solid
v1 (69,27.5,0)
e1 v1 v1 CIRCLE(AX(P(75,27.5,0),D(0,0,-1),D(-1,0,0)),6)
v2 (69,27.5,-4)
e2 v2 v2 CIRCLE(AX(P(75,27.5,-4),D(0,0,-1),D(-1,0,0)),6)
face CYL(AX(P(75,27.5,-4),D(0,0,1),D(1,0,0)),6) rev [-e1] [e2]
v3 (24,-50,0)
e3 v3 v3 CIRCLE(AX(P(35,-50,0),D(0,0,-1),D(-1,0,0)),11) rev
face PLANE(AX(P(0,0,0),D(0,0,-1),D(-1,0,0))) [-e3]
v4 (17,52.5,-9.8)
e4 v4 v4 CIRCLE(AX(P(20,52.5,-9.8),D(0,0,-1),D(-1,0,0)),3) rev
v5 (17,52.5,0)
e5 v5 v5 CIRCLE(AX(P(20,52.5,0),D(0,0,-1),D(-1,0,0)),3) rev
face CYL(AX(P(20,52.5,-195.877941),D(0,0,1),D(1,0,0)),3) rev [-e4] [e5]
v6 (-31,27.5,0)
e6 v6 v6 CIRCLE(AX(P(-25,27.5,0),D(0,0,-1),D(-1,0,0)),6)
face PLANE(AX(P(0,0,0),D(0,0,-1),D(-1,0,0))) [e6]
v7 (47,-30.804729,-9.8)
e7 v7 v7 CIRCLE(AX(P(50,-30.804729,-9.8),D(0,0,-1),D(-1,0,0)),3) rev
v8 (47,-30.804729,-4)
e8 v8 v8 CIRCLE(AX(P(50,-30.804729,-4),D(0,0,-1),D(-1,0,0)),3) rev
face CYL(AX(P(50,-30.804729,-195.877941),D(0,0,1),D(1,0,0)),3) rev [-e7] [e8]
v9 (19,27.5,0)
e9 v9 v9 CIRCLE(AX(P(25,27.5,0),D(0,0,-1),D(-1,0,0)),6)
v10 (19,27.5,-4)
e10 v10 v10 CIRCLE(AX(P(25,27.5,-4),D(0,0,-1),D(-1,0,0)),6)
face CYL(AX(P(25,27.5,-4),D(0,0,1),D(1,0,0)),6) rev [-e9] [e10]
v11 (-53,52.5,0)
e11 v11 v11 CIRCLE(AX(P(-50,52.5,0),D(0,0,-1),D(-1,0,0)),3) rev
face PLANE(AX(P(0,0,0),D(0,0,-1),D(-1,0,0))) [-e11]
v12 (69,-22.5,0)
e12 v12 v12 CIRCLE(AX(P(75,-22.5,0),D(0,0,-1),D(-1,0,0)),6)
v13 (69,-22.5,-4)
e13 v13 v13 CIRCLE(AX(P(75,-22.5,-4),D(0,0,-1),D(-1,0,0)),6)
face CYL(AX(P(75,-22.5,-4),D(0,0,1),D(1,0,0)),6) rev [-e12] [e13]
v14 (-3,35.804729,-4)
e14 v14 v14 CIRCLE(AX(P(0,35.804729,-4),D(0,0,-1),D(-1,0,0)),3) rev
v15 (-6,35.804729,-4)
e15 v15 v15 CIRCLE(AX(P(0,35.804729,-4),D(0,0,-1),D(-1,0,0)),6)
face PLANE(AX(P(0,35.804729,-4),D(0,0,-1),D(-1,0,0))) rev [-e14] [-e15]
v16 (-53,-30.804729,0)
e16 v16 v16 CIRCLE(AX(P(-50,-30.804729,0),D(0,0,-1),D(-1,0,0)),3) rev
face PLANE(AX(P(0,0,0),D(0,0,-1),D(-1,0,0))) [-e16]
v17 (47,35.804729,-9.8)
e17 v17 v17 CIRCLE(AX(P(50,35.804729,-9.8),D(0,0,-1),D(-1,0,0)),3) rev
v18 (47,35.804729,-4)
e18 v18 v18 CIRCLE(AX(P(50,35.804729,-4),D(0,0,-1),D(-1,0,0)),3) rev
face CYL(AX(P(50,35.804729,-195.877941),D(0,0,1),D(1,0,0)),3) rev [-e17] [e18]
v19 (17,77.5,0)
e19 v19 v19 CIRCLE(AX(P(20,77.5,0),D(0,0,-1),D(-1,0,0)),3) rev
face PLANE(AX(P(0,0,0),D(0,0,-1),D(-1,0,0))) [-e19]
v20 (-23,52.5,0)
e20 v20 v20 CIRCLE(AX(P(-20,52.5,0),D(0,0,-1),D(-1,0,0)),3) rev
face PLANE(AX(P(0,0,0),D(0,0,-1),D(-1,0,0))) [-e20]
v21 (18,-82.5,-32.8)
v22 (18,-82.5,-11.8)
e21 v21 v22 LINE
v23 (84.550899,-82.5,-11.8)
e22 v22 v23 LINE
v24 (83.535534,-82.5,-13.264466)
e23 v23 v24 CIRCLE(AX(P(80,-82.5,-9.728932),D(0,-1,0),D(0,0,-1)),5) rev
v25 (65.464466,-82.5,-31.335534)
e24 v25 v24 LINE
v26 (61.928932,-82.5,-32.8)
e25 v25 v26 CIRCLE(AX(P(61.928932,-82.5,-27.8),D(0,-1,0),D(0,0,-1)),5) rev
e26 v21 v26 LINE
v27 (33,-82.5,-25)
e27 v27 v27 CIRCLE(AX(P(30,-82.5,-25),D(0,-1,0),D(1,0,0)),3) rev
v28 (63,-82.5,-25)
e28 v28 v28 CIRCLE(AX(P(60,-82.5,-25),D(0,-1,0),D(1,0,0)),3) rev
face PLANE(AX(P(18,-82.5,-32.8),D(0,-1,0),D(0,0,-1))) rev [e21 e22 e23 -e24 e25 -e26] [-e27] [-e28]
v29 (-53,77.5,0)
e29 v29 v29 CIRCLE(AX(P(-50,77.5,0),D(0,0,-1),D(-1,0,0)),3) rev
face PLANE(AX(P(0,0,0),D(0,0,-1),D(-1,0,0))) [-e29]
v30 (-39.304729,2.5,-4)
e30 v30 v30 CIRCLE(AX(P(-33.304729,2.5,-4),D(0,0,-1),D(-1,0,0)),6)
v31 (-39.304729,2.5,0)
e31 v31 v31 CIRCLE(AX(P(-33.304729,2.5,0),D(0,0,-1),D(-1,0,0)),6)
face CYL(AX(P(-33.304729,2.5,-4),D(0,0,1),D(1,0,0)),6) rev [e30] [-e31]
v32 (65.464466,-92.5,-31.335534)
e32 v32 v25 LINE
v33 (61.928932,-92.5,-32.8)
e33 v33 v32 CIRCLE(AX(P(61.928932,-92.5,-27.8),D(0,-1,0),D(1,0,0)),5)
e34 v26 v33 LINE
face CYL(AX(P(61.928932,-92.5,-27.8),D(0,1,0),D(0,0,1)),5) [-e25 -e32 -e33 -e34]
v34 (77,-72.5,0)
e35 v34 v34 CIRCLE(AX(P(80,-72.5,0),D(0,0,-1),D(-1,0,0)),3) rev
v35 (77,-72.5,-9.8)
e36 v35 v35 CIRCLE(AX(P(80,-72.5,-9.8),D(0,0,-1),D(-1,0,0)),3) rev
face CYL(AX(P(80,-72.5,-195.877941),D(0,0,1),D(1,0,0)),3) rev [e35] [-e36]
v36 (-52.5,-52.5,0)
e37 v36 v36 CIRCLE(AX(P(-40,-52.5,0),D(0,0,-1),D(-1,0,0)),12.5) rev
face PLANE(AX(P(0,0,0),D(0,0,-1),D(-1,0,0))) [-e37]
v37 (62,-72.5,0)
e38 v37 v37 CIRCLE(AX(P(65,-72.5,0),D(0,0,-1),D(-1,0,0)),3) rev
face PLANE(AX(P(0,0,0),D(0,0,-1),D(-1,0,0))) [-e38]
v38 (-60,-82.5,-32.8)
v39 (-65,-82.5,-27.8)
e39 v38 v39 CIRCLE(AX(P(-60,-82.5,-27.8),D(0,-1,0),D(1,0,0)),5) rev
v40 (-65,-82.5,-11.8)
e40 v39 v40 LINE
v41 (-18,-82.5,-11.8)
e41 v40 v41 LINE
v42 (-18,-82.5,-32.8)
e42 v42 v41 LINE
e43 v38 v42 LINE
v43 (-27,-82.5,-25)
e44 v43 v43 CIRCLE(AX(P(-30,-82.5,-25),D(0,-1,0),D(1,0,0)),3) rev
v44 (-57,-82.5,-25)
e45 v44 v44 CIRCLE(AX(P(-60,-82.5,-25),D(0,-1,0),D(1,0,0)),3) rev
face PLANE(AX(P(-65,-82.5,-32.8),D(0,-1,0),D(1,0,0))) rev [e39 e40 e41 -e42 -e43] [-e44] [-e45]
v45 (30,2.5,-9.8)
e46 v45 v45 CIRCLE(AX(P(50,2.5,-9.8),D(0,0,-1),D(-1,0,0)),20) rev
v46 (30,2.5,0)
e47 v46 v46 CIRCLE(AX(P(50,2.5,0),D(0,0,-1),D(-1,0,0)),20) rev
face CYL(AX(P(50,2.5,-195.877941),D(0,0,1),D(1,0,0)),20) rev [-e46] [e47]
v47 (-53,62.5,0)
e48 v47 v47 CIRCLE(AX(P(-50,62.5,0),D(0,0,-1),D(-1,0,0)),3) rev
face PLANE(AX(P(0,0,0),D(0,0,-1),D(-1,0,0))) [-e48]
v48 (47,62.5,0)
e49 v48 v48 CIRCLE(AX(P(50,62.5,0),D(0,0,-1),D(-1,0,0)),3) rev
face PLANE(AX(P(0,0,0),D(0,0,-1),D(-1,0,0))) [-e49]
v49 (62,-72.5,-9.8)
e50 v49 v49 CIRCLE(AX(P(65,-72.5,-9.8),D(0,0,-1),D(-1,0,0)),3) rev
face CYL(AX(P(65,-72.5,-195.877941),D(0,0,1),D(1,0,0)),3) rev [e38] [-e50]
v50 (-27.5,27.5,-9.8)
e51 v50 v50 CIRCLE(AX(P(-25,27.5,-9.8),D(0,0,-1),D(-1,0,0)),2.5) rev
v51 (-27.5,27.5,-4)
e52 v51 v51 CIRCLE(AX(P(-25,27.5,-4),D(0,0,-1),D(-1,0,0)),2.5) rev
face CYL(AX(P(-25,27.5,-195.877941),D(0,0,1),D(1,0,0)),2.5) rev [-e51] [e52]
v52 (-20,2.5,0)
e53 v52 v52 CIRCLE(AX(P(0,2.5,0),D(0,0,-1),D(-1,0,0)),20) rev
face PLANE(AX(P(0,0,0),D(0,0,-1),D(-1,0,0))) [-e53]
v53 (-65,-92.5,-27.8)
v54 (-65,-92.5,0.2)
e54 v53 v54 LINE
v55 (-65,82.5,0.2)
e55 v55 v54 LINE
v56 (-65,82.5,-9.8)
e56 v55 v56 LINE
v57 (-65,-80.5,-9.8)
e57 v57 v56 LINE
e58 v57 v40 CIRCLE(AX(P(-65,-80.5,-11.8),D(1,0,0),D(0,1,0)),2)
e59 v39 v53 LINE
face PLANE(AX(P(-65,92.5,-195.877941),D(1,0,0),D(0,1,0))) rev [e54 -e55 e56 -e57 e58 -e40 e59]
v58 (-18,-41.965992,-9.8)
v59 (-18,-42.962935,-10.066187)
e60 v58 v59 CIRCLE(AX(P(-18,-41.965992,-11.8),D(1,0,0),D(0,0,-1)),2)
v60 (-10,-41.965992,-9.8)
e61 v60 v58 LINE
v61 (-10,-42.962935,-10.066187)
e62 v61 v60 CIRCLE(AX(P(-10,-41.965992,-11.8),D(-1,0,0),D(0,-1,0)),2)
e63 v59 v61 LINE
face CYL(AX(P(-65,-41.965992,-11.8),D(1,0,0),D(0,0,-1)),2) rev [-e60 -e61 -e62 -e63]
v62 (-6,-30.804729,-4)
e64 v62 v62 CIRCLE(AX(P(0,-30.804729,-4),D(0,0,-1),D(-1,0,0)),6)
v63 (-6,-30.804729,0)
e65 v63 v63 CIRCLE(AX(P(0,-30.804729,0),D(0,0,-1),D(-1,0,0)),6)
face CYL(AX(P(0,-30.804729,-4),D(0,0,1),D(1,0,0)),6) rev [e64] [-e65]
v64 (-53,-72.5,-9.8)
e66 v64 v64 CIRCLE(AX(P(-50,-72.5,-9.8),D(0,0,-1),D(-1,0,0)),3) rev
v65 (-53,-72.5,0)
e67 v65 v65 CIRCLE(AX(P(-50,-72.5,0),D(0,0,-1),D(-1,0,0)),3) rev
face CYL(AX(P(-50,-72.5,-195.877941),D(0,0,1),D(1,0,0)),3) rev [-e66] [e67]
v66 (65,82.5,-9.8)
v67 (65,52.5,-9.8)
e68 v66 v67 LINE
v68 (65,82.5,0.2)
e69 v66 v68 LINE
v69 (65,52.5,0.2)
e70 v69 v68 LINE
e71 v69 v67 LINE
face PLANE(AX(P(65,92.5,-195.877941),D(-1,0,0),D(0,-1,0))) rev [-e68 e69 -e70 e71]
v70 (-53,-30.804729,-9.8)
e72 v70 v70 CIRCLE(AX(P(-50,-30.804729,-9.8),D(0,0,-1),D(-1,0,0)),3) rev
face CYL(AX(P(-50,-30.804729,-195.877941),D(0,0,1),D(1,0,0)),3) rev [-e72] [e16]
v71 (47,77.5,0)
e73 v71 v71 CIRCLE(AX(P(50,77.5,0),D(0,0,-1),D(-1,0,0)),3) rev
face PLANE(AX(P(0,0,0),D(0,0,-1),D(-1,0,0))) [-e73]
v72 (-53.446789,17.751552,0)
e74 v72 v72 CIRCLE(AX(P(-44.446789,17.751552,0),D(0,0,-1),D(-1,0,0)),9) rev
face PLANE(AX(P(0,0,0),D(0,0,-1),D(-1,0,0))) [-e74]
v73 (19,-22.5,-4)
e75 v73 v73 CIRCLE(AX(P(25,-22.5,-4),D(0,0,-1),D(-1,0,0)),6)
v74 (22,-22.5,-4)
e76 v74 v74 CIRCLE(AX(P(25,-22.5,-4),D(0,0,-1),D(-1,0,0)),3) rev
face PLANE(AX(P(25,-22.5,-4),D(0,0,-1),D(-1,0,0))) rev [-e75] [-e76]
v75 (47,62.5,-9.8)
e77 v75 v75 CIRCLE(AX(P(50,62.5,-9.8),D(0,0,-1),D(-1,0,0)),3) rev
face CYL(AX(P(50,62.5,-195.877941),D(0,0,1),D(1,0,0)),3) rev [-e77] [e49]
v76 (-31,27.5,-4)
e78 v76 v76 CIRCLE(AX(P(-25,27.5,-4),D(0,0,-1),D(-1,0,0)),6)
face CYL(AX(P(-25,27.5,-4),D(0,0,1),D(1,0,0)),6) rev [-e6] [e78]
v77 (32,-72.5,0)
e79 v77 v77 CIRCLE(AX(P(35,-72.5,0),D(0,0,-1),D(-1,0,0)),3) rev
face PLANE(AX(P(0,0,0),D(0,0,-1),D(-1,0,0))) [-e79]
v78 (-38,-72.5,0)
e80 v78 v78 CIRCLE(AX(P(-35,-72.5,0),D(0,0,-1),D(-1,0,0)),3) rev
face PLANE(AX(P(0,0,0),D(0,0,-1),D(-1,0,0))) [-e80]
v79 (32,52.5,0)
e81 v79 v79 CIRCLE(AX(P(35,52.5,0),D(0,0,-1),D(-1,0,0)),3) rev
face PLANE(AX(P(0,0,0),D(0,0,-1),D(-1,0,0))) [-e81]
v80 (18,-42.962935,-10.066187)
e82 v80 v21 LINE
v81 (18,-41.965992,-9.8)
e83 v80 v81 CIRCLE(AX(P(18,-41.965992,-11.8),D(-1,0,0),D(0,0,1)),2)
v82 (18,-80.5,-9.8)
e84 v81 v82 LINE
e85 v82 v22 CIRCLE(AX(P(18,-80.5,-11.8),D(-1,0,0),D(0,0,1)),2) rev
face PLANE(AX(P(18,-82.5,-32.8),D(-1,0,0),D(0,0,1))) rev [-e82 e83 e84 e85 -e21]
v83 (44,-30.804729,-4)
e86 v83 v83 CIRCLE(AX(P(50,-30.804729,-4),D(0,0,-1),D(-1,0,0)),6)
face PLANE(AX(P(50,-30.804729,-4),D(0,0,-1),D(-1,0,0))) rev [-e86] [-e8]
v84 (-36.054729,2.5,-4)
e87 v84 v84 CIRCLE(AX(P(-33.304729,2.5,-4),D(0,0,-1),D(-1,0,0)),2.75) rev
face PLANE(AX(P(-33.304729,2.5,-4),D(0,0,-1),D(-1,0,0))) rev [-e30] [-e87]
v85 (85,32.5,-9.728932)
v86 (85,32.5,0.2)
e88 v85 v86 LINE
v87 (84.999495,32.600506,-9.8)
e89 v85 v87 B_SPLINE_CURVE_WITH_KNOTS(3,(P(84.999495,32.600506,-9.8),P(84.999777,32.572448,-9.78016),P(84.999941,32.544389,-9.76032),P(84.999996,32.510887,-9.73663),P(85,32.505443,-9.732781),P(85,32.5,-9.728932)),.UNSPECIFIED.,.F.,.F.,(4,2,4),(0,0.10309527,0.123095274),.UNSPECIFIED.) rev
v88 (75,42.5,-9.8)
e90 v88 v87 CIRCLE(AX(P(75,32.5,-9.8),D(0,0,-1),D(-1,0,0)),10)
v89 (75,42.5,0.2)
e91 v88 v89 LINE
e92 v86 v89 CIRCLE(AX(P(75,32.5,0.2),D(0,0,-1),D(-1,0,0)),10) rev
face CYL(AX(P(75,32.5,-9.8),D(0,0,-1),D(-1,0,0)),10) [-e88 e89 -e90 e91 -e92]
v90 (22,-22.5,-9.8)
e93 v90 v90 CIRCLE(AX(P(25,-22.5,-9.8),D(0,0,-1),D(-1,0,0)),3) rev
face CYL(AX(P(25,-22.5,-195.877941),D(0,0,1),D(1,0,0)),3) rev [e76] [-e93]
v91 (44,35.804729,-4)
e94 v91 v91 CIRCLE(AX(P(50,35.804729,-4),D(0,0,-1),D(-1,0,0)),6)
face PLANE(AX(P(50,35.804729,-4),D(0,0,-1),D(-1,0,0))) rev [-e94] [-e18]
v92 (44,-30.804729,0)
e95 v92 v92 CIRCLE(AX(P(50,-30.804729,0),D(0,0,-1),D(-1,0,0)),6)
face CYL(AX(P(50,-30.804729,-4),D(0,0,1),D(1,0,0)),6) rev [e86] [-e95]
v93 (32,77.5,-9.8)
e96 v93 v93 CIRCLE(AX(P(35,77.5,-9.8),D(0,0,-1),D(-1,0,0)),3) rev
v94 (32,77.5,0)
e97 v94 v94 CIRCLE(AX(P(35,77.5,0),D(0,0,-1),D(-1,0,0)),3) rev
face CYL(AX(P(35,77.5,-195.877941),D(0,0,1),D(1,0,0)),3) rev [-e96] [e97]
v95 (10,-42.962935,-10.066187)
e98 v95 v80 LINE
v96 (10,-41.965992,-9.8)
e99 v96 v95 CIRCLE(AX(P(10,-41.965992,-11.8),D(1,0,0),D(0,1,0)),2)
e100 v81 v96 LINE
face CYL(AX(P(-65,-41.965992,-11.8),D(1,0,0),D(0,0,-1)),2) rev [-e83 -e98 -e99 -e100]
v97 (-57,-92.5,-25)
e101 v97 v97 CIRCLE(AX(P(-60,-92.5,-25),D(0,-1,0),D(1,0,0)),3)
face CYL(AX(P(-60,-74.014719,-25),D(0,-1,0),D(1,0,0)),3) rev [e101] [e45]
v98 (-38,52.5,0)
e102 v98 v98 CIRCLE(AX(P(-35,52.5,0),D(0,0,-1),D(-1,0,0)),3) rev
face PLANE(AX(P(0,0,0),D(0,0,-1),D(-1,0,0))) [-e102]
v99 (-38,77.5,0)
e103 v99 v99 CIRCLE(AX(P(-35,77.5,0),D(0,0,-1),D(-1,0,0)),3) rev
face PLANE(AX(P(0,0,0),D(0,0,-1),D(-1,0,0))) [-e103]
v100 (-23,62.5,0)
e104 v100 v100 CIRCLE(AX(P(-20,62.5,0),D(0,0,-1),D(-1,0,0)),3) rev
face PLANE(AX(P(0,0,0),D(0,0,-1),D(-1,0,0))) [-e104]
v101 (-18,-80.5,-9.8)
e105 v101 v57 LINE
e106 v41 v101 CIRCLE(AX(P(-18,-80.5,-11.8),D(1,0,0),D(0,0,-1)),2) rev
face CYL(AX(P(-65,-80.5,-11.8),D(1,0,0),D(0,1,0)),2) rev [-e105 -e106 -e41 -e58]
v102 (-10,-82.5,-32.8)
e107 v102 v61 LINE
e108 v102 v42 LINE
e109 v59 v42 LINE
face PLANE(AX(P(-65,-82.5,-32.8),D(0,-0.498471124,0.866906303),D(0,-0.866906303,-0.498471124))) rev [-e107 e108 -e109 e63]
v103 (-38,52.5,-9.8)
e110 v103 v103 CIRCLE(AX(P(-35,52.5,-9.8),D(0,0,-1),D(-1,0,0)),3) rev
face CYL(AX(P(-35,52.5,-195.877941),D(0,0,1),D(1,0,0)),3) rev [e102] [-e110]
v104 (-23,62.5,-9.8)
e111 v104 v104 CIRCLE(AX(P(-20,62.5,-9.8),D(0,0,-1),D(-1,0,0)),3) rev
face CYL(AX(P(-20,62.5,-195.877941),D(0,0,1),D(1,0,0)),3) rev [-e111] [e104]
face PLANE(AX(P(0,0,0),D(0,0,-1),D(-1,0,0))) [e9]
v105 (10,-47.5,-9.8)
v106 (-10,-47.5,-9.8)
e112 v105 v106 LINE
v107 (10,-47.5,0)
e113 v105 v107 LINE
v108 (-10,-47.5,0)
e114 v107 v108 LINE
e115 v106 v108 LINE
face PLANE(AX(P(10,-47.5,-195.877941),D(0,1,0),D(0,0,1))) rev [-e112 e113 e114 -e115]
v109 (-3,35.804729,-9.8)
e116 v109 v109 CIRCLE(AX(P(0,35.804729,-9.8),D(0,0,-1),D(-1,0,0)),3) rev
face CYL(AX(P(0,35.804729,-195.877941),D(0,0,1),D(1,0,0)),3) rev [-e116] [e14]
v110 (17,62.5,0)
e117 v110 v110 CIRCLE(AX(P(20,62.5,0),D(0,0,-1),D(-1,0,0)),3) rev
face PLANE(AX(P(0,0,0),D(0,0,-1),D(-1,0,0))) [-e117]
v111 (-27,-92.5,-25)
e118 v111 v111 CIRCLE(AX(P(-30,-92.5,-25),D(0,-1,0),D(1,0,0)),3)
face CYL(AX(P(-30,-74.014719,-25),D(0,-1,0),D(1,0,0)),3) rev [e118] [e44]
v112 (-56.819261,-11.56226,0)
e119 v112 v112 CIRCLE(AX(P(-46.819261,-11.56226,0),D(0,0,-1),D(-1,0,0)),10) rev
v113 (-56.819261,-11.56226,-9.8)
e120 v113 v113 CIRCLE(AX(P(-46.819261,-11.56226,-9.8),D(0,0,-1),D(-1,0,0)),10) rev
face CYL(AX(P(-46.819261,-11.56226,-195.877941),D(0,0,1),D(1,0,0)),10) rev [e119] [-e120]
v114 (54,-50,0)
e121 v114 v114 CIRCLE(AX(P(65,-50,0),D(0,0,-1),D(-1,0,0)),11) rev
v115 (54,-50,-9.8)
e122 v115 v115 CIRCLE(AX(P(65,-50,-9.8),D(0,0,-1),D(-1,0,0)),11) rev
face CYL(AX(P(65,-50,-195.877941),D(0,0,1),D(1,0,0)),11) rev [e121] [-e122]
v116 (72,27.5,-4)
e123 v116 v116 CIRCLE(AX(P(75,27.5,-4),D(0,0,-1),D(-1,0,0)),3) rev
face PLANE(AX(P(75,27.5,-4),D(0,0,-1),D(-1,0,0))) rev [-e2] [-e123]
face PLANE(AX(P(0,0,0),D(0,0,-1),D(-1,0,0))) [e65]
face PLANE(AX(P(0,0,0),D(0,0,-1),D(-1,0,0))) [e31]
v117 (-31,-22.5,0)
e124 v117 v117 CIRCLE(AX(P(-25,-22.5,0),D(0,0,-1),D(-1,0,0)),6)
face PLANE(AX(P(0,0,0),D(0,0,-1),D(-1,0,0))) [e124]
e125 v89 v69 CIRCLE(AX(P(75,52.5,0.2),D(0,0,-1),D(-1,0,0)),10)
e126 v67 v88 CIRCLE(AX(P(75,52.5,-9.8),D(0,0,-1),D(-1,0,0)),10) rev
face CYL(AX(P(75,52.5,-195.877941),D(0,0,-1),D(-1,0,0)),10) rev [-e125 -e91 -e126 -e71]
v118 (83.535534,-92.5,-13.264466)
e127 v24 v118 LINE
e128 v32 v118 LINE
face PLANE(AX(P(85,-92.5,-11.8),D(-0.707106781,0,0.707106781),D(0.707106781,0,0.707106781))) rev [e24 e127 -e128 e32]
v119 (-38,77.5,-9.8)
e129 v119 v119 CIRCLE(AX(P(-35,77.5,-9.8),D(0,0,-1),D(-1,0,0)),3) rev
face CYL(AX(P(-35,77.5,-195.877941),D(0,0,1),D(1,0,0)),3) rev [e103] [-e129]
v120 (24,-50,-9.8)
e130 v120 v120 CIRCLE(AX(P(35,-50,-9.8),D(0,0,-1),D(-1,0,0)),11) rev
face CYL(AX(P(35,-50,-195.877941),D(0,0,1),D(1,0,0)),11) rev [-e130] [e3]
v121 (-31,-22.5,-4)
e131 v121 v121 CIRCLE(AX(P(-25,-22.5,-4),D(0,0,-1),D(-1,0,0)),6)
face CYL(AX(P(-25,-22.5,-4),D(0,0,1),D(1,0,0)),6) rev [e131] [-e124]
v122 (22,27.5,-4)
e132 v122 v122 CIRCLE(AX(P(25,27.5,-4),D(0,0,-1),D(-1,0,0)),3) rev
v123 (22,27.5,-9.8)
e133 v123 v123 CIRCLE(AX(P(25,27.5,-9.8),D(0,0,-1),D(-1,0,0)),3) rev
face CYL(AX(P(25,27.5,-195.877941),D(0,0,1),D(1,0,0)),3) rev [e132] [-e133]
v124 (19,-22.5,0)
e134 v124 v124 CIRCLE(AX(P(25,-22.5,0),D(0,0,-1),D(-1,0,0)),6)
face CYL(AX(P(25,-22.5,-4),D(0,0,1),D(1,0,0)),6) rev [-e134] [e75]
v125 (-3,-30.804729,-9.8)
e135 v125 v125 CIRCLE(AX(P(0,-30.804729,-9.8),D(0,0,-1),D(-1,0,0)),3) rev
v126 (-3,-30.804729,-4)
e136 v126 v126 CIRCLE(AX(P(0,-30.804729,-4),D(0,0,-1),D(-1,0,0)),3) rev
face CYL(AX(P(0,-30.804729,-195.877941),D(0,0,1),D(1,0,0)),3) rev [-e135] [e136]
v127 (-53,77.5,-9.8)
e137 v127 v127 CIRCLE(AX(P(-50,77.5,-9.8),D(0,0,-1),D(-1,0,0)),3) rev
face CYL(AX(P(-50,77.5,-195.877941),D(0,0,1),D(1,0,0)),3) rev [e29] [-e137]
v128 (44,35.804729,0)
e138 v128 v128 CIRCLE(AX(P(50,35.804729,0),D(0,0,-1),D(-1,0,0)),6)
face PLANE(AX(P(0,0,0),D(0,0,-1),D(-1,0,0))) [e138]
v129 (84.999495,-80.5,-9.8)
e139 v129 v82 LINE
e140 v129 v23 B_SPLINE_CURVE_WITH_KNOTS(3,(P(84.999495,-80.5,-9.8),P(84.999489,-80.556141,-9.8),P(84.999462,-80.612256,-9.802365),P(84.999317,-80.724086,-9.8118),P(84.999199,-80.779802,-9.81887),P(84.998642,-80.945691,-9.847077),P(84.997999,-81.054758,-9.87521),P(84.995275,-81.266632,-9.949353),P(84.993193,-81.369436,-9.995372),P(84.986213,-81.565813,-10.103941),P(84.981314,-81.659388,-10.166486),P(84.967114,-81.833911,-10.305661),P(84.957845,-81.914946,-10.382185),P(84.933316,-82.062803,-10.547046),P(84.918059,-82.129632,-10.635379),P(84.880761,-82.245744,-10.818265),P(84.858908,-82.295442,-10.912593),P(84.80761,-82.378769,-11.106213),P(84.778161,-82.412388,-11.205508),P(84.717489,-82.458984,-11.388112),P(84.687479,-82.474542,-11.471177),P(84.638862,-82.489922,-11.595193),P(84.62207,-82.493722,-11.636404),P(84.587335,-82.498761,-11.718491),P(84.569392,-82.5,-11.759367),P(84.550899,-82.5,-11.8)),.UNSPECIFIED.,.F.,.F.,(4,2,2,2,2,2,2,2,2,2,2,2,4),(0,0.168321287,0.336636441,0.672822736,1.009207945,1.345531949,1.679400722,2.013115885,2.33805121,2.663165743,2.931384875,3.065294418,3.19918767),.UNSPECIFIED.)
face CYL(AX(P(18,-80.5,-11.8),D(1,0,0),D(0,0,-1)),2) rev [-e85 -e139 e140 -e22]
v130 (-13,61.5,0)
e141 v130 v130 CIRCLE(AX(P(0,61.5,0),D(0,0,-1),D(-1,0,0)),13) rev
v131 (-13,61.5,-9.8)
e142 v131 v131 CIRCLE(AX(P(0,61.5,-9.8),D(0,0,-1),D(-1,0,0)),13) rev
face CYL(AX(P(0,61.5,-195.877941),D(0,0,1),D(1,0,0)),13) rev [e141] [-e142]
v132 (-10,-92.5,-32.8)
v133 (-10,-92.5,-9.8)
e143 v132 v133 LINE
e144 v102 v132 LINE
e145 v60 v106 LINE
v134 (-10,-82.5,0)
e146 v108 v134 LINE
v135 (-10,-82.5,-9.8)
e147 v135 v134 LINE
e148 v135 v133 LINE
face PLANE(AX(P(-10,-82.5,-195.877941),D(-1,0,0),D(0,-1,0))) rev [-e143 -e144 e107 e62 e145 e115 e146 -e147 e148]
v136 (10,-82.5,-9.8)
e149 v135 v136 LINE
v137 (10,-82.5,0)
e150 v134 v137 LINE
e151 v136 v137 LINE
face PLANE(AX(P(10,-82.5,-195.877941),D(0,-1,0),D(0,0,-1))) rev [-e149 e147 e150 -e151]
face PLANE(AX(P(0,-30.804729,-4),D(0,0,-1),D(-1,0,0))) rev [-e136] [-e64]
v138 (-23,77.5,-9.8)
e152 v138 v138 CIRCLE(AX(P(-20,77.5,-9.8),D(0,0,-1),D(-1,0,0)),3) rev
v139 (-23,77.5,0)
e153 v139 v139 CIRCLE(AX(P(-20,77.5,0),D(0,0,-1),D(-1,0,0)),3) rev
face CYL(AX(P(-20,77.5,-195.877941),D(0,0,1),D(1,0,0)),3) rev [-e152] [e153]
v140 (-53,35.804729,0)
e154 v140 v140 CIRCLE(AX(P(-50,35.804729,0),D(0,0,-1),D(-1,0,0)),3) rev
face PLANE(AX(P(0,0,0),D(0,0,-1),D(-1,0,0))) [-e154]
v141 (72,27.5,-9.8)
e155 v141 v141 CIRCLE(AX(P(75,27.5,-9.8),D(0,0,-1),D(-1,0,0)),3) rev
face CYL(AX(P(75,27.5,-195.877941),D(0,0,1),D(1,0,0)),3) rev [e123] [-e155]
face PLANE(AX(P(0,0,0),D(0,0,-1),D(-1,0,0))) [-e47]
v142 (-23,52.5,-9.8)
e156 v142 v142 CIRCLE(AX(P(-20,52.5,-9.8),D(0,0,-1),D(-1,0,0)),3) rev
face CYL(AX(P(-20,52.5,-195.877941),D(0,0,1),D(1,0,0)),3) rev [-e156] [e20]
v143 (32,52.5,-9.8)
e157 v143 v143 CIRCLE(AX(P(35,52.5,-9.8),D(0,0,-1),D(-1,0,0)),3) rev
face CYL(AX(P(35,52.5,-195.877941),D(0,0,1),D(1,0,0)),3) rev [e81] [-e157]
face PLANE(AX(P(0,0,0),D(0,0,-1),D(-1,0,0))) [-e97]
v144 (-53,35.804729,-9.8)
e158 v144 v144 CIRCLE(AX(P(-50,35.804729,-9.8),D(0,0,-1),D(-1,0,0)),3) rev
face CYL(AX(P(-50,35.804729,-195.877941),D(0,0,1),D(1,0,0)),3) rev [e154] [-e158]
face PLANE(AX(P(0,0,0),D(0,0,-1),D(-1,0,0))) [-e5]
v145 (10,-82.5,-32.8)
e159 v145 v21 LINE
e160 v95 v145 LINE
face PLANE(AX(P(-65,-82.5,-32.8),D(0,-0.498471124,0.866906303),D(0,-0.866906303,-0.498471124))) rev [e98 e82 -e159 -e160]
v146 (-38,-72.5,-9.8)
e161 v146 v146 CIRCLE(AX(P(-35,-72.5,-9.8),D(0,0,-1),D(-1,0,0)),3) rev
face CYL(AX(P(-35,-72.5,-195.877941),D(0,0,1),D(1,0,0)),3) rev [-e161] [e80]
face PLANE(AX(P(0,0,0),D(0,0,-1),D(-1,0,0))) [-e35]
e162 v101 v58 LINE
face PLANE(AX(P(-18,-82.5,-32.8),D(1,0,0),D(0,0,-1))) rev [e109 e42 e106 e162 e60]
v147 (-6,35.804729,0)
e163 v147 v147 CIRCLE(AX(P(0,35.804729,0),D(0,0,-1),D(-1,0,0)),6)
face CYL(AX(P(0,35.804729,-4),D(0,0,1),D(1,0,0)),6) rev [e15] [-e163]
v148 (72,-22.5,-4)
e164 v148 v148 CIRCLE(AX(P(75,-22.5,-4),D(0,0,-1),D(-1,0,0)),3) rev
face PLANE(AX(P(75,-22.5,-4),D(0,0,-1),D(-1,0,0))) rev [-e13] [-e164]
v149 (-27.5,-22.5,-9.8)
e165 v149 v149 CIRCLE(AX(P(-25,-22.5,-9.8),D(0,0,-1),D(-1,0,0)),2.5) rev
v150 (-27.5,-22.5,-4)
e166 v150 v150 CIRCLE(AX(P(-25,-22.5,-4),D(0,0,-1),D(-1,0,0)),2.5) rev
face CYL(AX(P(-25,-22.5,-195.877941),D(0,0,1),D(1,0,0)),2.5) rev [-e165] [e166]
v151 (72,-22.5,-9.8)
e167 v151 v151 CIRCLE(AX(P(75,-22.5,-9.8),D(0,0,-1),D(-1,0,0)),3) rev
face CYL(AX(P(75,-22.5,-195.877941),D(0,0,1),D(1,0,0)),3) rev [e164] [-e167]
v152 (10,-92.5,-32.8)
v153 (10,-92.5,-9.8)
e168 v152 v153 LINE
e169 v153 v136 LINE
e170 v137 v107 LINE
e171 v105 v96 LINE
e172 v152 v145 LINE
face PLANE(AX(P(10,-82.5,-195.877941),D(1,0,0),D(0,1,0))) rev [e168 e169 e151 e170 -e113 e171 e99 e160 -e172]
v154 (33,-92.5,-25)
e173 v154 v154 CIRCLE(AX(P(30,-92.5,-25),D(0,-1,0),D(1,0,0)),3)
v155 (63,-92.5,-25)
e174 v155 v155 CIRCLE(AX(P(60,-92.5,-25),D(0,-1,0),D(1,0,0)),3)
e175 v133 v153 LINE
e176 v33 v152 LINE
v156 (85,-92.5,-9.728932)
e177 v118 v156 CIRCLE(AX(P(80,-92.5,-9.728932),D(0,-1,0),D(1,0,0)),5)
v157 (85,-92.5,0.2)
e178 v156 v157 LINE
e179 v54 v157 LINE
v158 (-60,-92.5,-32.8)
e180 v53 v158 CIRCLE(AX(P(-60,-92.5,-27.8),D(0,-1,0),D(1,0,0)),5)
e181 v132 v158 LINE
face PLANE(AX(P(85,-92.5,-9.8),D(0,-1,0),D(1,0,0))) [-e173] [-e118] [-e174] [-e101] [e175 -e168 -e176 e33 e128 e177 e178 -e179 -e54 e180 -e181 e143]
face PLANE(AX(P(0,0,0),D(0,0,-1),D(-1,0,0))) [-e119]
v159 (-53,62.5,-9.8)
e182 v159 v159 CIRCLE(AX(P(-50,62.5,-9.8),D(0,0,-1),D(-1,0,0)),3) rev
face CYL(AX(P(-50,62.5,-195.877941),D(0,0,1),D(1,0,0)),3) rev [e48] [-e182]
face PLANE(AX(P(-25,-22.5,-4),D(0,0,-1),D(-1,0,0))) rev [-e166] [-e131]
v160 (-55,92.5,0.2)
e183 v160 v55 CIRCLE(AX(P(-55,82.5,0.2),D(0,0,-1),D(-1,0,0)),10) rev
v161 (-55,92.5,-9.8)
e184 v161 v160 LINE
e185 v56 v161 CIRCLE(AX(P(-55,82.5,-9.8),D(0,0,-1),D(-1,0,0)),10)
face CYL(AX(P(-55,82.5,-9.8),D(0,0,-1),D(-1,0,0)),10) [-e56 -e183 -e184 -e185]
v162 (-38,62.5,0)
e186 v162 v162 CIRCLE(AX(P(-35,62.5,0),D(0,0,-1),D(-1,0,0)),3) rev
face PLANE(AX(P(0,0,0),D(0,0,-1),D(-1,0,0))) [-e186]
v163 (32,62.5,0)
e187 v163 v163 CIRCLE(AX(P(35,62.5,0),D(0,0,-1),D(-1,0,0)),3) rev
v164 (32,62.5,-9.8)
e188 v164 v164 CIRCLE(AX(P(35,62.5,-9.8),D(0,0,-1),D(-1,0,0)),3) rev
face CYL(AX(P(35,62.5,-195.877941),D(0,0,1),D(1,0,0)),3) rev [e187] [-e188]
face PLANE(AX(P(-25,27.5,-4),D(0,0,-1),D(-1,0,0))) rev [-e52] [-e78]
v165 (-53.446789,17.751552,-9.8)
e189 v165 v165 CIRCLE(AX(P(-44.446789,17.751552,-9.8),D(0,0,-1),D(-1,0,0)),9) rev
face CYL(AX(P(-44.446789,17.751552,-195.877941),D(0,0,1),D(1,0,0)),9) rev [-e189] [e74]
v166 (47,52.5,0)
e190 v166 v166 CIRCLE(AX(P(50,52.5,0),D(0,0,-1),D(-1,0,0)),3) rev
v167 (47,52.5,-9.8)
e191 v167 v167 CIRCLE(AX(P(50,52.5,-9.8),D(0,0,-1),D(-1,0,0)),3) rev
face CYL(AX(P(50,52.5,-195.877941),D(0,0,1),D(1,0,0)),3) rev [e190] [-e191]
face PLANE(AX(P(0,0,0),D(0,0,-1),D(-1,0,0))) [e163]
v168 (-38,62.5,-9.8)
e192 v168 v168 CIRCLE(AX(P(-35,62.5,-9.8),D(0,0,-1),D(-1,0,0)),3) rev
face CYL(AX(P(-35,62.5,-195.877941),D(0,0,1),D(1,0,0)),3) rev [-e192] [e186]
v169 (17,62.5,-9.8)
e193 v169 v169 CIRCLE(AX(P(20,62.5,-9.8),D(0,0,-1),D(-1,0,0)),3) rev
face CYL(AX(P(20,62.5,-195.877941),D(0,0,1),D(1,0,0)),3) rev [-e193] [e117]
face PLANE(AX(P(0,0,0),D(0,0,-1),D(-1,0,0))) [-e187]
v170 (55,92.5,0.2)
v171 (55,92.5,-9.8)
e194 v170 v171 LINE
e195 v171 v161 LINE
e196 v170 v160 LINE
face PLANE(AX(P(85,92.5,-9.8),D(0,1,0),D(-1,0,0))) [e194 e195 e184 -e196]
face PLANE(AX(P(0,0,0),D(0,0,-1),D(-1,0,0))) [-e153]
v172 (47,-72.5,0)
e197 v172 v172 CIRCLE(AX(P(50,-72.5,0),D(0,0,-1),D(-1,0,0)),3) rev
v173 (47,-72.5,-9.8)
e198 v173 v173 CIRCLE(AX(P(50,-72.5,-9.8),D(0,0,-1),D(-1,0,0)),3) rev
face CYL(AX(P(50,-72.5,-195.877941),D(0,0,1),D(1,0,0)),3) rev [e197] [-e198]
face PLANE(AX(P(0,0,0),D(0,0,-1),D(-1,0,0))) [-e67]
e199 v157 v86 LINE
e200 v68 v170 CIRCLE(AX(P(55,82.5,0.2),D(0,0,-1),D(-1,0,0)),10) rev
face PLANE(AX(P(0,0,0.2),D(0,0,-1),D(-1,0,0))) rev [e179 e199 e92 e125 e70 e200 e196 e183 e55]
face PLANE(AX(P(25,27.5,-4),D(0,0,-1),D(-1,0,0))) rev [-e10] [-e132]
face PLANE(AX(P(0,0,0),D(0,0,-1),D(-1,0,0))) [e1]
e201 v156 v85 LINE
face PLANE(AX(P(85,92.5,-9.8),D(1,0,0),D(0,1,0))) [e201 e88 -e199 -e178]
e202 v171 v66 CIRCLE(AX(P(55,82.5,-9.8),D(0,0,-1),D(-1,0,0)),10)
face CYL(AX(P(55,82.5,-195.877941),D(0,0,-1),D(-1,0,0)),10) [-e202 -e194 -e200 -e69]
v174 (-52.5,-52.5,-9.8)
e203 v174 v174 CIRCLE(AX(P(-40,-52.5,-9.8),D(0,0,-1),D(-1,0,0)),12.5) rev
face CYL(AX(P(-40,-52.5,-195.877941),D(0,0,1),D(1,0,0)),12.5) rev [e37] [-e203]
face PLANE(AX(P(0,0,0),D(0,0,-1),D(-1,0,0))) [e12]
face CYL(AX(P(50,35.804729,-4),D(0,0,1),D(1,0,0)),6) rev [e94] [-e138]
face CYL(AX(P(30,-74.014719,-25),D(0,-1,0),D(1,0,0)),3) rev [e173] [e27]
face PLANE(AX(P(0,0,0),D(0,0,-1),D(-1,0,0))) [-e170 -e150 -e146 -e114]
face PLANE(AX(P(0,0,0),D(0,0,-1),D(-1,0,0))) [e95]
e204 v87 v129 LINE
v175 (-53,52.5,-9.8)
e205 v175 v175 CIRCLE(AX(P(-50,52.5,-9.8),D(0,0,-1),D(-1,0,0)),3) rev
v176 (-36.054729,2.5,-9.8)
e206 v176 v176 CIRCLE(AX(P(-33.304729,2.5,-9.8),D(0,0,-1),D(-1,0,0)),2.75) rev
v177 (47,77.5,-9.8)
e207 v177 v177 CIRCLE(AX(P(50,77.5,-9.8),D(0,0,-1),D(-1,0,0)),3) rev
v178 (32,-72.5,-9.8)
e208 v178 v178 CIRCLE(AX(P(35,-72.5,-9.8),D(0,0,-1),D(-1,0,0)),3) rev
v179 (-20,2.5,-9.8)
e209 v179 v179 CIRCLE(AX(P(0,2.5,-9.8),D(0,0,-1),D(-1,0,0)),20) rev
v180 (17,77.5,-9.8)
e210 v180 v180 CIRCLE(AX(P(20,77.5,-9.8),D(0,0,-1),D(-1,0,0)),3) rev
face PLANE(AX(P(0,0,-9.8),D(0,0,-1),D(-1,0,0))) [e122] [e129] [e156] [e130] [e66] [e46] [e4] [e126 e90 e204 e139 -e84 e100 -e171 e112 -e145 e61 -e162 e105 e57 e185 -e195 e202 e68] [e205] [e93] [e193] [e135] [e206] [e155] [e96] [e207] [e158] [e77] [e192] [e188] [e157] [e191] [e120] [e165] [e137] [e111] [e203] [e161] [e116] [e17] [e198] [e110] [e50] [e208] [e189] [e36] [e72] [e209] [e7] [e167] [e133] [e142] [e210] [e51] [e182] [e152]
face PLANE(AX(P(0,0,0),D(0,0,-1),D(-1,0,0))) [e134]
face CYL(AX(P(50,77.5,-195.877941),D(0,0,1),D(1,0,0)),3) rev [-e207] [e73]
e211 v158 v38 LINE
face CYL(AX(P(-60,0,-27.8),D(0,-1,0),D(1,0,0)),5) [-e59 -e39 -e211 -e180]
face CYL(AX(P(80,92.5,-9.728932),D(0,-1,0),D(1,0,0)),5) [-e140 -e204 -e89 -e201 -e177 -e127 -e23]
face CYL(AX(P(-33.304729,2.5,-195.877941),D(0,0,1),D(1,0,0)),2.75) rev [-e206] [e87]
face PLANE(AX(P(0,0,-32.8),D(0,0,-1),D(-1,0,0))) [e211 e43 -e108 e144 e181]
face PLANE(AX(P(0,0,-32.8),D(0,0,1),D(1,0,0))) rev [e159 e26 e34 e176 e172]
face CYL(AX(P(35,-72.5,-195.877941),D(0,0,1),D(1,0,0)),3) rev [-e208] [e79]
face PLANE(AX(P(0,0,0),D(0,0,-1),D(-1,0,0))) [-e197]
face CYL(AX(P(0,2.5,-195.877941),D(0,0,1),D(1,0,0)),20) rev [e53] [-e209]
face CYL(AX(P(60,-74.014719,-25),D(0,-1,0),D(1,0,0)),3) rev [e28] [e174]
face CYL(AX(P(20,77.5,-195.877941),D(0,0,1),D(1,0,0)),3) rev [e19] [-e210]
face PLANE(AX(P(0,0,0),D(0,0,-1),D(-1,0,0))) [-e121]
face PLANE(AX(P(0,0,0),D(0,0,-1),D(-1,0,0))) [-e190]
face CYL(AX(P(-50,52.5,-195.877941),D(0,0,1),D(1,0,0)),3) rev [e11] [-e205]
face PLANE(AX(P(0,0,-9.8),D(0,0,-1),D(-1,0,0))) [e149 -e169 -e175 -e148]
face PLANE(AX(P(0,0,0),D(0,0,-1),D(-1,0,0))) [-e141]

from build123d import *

# Parameters (mm, degrees)
SKETCH2_W           = 170
SKETCH2_H           = 185
BOSS_EXTRUDE1_DEPTH = 9.8
SKETCH4_R           = 3
SKETCH4_R_2         = 2.5
SKETCH4_R_3         = 20
SKETCH4_R_4         = 9
SKETCH4_R_5         = 13
SKETCH4_R_6         = 10
SKETCH4_R_7         = 2.75
SKETCH4_R_8         = 11
SKETCH4_R_9         = 12.5
SKETCH4_W           = 20
SKETCH4_H           = 185
SKETCH4_H_2         = 35
SKETCH4_H_3         = 50
HOLES_DEPTH         = 9.8
FEET_DEPTH          = 23
SKETCH7_R           = 3
FEET_HOLE_DEPTH     = 10
MOTOR_SINK_START    = -9.8
SKETCH9_R           = 6
MOTOR_SINK_DEPTH    = 4
BOSS_EXTRUDE2_DEPTH = 0.2
FILLET4_R           = 10
CUT_EXTRUDE2_DEPTH  = 129.534392285
FILLET6_R           = 2
CUT_EXTRUDE3_DEPTH  = 198.296325359
FILLET7_R           = 5


# Some blends are built 0.0001 mm under size
with BuildPart() as part:
    # Sketch2 → Boss-Extrude1 (new body)
    with BuildSketch(Plane.XY):
        Rectangle(SKETCH2_W, SKETCH2_H)
    extrude(amount=-BOSS_EXTRUDE1_DEPTH)

    # Sketch4 → holes (cut)
    with BuildSketch(Plane.XY):
        with Locations((50, 77.5)):
            Circle(SKETCH4_R)
        with Locations(Location((50, -72.5, 0), (0, 0, 180))):
            Circle(SKETCH4_R)
        with Locations(Location((-25, -22.5, 0), (0, 0, 180))):
            Circle(SKETCH4_R_2)
        with Locations((-50, 77.5)):
            Circle(SKETCH4_R)
        with Locations((50, 2.5)):
            Circle(SKETCH4_R_3)
        with Locations(Location((25, -22.5, 0), (0, 0, 180))):
            Circle(SKETCH4_R)
        with Locations((-50, 62.5)):
            Circle(SKETCH4_R)
        with Locations(Location((-25, 27.5, 0), (0, 0, 180))):
            Circle(SKETCH4_R_2)
        with Locations((0, 2.5)):
            Circle(SKETCH4_R_3)
        with Locations((0, 35.804729394)):
            Circle(SKETCH4_R)
        with Locations((0, -30.804729394)):
            Circle(SKETCH4_R)
        with Locations(Location((75, -22.5, 0), (0, 0, 180))):
            Circle(SKETCH4_R)
        with Locations(Location((75, 27.5, 0), (0, 0, 180))):
            Circle(SKETCH4_R)
        with Locations(Location((25, 27.5, 0), (0, 0, 180))):
            Circle(SKETCH4_R)
        with Locations(Location((35, -72.5, 0), (0, 0, 180))):
            Circle(SKETCH4_R)
        with Locations(Location((-50, -30.804729394, 0), (0, 0, 180))):
            Circle(SKETCH4_R)
        with Locations(Location((-20, 77.5, 0), (0, 0, 180))):
            Circle(SKETCH4_R)
        with Locations((20, 77.5)):
            Circle(SKETCH4_R)
        with Locations(Location((-50, 35.804729394, 0), (0, 0, 180))):
            Circle(SKETCH4_R)
        with Locations((-44.446789408, 17.751552332)):
            Circle(SKETCH4_R_4)
        with Locations((0, 61.5)):
            Circle(SKETCH4_R_5)
        with Locations((-46.819261128, -11.562260058)):
            Circle(SKETCH4_R_6)
        with Locations((-35, -72.5)):
            Circle(SKETCH4_R)
        with Locations((-33.304729394, 2.5)):
            Circle(SKETCH4_R_7)
        with Locations((35, -50)):
            Circle(SKETCH4_R_8)
        with Locations((-40, -52.5)):
            Circle(SKETCH4_R_9)
        with Locations(Location((-50, -72.5, 0), (0, 0, 180))):
            Circle(SKETCH4_R)
        with Locations(Location((-35, 62.5, 0), (0, 0, 180))):
            Circle(SKETCH4_R)
        with Locations(Location((-35, 52.5, 0), (0, 0, 180))):
            Circle(SKETCH4_R)
        with Locations((50, -30.804729394)):
            Circle(SKETCH4_R)
        with Locations((35, 77.5)):
            Circle(SKETCH4_R)
        with Locations(Location((-35, 77.5, 0), (0, 0, 180))):
            Circle(SKETCH4_R)
        with Locations((65, -50)):
            Circle(SKETCH4_R_8)
        with Locations(Location((50, 62.5, 0), (0, 0, 180))):
            Circle(SKETCH4_R)
        with Locations((50, 35.804729394)):
            Circle(SKETCH4_R)
        with Locations(Location((65, -72.5, 0), (0, 0, 180))):
            Circle(SKETCH4_R)
        with Locations(Location((80, -72.5, 0), (0, 0, 180))):
            Circle(SKETCH4_R)
        with Locations((-50, 52.5)):
            Circle(SKETCH4_R)
        with Locations((35, 62.5)):
            Circle(SKETCH4_R)
        with Locations(Location((-20, 52.5, 0), (0, 0, 180))):
            Circle(SKETCH4_R)
        with Locations((20, 52.5)):
            Circle(SKETCH4_R)
        with Locations(Location((-20, 62.5, 0), (0, 0, 180))):
            Circle(SKETCH4_R)
        with Locations((20, 62.5)):
            Circle(SKETCH4_R)
        with Locations((35, 52.5)):
            Circle(SKETCH4_R)
        with Locations(Location((50, 52.5, 0), (0, 0, 180))):
            Circle(SKETCH4_R)
        with Locations((-75, 0)):
            Rectangle(SKETCH4_W, SKETCH4_H)
        with Locations((0, -65)):
            Rectangle(SKETCH4_W, SKETCH4_H_2)
        with Locations((75, 67.5)):
            Rectangle(SKETCH4_W, SKETCH4_H_3)
    extrude(amount=-HOLES_DEPTH, mode=Mode.SUBTRACT)

    # Sketch6 → feet (add)
    with BuildSketch(Plane(origin=(0, 0, -9.8), x_dir=(-1, 0, 0), z_dir=(0, 0, -1))):
        Polygon((-10, -82.5), (-10, -92.5), (-85, -92.5), (-85, -82.5), (-18, -82.5), (-18, -42.5), (-10, -42.5), align=None)
        Polygon((10, -82.5), (10, -42.5), (18, -42.5), (18, -82.5), (65, -82.5), (65, -92.5), (10, -92.5), align=None)
    extrude(amount=FEET_DEPTH)

    # Sketch7 → feet-hole (cut)
    with BuildSketch(Plane.XZ.offset(92.5)):
        with Locations((60, -25)):
            Circle(SKETCH7_R)
        with Locations((30, -25)):
            Circle(SKETCH7_R)
        with Locations((-30, -25)):
            Circle(SKETCH7_R)
        with Locations((-60, -25)):
            Circle(SKETCH7_R)
    extrude(amount=-FEET_HOLE_DEPTH, mode=Mode.SUBTRACT)

    # Sketch9 → motor_sink (cut)
    with BuildSketch(Plane(origin=(0, 0, -9.8), x_dir=(-1, 0, 0), z_dir=(0, 0, -1)).offset(MOTOR_SINK_START)):
        with Locations((-75, -22.5)):
            Circle(SKETCH9_R)
        with Locations((-25, -22.5)):
            Circle(SKETCH9_R)
        with Locations((-25, 27.5)):
            Circle(SKETCH9_R)
        with Locations((-75, 27.5)):
            Circle(SKETCH9_R)
        with Locations((-50, -30.804729394)):
            Circle(SKETCH9_R)
        with Locations((25, 27.5)):
            Circle(SKETCH9_R)
        with Locations((25, -22.5)):
            Circle(SKETCH9_R)
        with Locations((0, -30.804729394)):
            Circle(SKETCH9_R)
        with Locations((-50, 35.804729394)):
            Circle(SKETCH9_R)
        with Locations((33.304729394, 2.5)):
            Circle(SKETCH9_R)
        with Locations((0, 35.804729394)):
            Circle(SKETCH9_R)
    extrude(amount=MOTOR_SINK_DEPTH, mode=Mode.SUBTRACT)

    # Sketch13 → Boss-Extrude2 (add)
    with BuildSketch(Plane.XY):
        Polygon((-65, 92.5), (65, 92.5), (65, 42.5), (85, 42.5), (85, -92.5), (-65, -92.5), align=None)
    extrude(amount=BOSS_EXTRUDE2_DEPTH)

    # Fillet4
    fillet4_edges = [part.edges().sort_by_distance(p)[0] for p in [
        (65, 42.5, -4.8),
        (-65, 92.5, -4.8),
        (85, 42.5, -4.8),
        (65, 92.5, -4.8),
    ]]
    fillet(fillet4_edges, radius=FILLET4_R - 0.0001)  # a hair under: the kernel refuses the full size

    # Sketch14 → Cut-Extrude2 (cut, through all)
    with BuildSketch(Plane(origin=(18, 0, 0), x_dir=(0, 0, -1), z_dir=(1, 0, 0))):
        Polygon((32.8, -82.5), (9.8, -42.5), (32.8, -42.5), align=None)
    extrude(amount=-CUT_EXTRUDE2_DEPTH, mode=Mode.SUBTRACT)

    # Fillet6
    fillet6_edges = [part.edges().sort_by_distance(p)[0] for p in [
        (14, -42.5, -9.8),
        (51.5, -82.5, -9.8),
        (-41.5, -82.5, -9.8),
        (-14, -42.5, -9.8),
    ]]
    fillet(fillet6_edges, radius=FILLET6_R)

    # Sketch16 → Cut-Extrude3 (cut, through all)
    with BuildSketch(Plane(origin=(0, -82.5, 0), x_dir=(1, 0, 0), z_dir=(0, 1, 0))):
        Polygon((85, 11.8), (64, 32.8), (85, 32.8), align=None)
    extrude(amount=-CUT_EXTRUDE3_DEPTH, mode=Mode.SUBTRACT)

    # Fillet7
    # the kernel refuses this fillet: 5 mm, written as the material it takes off along each edge
    with BuildSketch(Plane(origin=(85, -77.32233047, -11.8), x_dir=(0, 0, 1), z_dir=(0, -1, 0))) as fillet7_piece_1:
        with BuildLine():
            CenterArc((FILLET7_R * 0.414213562373, FILLET7_R), FILLET7_R, 225, 45)
            Line((-FILLET7_R * 0.292893218813, FILLET7_R * 0.292893218813), (0, 0))
            Line((0, 0), (FILLET7_R * 0.414213562373, 0))
        make_face()
    extrude(amount=20.355339059, mode=Mode.SUBTRACT)
    with BuildSketch(Plane(origin=(64, -77.32233047, -32.8), x_dir=(-1, 0, 0), z_dir=(0, -1, 0))) as fillet7_piece_2:
        with BuildLine():
            CenterArc((FILLET7_R * 0.414213562373, -FILLET7_R), FILLET7_R, 90, 45)
            Line((-FILLET7_R * 0.292893218813, -FILLET7_R * 0.292893218813), (0, 0))
            Line((0, 0), (FILLET7_R * 0.414213562373, 0))
        make_face()
    extrude(amount=20.355339059, mode=Mode.SUBTRACT)
    with BuildSketch(Plane(origin=(-65, -70, -32.8), x_dir=(0, 0, 1), z_dir=(0, -1, 0))) as fillet7_piece_3:
        with BuildLine():
            CenterArc((FILLET7_R, -FILLET7_R), FILLET7_R, 90, 90)
            Line((0, -FILLET7_R), (0, 0))
            Line((0, 0), (FILLET7_R, 0))
        make_face()
    extrude(amount=35, mode=Mode.SUBTRACT)


solid = part.part
